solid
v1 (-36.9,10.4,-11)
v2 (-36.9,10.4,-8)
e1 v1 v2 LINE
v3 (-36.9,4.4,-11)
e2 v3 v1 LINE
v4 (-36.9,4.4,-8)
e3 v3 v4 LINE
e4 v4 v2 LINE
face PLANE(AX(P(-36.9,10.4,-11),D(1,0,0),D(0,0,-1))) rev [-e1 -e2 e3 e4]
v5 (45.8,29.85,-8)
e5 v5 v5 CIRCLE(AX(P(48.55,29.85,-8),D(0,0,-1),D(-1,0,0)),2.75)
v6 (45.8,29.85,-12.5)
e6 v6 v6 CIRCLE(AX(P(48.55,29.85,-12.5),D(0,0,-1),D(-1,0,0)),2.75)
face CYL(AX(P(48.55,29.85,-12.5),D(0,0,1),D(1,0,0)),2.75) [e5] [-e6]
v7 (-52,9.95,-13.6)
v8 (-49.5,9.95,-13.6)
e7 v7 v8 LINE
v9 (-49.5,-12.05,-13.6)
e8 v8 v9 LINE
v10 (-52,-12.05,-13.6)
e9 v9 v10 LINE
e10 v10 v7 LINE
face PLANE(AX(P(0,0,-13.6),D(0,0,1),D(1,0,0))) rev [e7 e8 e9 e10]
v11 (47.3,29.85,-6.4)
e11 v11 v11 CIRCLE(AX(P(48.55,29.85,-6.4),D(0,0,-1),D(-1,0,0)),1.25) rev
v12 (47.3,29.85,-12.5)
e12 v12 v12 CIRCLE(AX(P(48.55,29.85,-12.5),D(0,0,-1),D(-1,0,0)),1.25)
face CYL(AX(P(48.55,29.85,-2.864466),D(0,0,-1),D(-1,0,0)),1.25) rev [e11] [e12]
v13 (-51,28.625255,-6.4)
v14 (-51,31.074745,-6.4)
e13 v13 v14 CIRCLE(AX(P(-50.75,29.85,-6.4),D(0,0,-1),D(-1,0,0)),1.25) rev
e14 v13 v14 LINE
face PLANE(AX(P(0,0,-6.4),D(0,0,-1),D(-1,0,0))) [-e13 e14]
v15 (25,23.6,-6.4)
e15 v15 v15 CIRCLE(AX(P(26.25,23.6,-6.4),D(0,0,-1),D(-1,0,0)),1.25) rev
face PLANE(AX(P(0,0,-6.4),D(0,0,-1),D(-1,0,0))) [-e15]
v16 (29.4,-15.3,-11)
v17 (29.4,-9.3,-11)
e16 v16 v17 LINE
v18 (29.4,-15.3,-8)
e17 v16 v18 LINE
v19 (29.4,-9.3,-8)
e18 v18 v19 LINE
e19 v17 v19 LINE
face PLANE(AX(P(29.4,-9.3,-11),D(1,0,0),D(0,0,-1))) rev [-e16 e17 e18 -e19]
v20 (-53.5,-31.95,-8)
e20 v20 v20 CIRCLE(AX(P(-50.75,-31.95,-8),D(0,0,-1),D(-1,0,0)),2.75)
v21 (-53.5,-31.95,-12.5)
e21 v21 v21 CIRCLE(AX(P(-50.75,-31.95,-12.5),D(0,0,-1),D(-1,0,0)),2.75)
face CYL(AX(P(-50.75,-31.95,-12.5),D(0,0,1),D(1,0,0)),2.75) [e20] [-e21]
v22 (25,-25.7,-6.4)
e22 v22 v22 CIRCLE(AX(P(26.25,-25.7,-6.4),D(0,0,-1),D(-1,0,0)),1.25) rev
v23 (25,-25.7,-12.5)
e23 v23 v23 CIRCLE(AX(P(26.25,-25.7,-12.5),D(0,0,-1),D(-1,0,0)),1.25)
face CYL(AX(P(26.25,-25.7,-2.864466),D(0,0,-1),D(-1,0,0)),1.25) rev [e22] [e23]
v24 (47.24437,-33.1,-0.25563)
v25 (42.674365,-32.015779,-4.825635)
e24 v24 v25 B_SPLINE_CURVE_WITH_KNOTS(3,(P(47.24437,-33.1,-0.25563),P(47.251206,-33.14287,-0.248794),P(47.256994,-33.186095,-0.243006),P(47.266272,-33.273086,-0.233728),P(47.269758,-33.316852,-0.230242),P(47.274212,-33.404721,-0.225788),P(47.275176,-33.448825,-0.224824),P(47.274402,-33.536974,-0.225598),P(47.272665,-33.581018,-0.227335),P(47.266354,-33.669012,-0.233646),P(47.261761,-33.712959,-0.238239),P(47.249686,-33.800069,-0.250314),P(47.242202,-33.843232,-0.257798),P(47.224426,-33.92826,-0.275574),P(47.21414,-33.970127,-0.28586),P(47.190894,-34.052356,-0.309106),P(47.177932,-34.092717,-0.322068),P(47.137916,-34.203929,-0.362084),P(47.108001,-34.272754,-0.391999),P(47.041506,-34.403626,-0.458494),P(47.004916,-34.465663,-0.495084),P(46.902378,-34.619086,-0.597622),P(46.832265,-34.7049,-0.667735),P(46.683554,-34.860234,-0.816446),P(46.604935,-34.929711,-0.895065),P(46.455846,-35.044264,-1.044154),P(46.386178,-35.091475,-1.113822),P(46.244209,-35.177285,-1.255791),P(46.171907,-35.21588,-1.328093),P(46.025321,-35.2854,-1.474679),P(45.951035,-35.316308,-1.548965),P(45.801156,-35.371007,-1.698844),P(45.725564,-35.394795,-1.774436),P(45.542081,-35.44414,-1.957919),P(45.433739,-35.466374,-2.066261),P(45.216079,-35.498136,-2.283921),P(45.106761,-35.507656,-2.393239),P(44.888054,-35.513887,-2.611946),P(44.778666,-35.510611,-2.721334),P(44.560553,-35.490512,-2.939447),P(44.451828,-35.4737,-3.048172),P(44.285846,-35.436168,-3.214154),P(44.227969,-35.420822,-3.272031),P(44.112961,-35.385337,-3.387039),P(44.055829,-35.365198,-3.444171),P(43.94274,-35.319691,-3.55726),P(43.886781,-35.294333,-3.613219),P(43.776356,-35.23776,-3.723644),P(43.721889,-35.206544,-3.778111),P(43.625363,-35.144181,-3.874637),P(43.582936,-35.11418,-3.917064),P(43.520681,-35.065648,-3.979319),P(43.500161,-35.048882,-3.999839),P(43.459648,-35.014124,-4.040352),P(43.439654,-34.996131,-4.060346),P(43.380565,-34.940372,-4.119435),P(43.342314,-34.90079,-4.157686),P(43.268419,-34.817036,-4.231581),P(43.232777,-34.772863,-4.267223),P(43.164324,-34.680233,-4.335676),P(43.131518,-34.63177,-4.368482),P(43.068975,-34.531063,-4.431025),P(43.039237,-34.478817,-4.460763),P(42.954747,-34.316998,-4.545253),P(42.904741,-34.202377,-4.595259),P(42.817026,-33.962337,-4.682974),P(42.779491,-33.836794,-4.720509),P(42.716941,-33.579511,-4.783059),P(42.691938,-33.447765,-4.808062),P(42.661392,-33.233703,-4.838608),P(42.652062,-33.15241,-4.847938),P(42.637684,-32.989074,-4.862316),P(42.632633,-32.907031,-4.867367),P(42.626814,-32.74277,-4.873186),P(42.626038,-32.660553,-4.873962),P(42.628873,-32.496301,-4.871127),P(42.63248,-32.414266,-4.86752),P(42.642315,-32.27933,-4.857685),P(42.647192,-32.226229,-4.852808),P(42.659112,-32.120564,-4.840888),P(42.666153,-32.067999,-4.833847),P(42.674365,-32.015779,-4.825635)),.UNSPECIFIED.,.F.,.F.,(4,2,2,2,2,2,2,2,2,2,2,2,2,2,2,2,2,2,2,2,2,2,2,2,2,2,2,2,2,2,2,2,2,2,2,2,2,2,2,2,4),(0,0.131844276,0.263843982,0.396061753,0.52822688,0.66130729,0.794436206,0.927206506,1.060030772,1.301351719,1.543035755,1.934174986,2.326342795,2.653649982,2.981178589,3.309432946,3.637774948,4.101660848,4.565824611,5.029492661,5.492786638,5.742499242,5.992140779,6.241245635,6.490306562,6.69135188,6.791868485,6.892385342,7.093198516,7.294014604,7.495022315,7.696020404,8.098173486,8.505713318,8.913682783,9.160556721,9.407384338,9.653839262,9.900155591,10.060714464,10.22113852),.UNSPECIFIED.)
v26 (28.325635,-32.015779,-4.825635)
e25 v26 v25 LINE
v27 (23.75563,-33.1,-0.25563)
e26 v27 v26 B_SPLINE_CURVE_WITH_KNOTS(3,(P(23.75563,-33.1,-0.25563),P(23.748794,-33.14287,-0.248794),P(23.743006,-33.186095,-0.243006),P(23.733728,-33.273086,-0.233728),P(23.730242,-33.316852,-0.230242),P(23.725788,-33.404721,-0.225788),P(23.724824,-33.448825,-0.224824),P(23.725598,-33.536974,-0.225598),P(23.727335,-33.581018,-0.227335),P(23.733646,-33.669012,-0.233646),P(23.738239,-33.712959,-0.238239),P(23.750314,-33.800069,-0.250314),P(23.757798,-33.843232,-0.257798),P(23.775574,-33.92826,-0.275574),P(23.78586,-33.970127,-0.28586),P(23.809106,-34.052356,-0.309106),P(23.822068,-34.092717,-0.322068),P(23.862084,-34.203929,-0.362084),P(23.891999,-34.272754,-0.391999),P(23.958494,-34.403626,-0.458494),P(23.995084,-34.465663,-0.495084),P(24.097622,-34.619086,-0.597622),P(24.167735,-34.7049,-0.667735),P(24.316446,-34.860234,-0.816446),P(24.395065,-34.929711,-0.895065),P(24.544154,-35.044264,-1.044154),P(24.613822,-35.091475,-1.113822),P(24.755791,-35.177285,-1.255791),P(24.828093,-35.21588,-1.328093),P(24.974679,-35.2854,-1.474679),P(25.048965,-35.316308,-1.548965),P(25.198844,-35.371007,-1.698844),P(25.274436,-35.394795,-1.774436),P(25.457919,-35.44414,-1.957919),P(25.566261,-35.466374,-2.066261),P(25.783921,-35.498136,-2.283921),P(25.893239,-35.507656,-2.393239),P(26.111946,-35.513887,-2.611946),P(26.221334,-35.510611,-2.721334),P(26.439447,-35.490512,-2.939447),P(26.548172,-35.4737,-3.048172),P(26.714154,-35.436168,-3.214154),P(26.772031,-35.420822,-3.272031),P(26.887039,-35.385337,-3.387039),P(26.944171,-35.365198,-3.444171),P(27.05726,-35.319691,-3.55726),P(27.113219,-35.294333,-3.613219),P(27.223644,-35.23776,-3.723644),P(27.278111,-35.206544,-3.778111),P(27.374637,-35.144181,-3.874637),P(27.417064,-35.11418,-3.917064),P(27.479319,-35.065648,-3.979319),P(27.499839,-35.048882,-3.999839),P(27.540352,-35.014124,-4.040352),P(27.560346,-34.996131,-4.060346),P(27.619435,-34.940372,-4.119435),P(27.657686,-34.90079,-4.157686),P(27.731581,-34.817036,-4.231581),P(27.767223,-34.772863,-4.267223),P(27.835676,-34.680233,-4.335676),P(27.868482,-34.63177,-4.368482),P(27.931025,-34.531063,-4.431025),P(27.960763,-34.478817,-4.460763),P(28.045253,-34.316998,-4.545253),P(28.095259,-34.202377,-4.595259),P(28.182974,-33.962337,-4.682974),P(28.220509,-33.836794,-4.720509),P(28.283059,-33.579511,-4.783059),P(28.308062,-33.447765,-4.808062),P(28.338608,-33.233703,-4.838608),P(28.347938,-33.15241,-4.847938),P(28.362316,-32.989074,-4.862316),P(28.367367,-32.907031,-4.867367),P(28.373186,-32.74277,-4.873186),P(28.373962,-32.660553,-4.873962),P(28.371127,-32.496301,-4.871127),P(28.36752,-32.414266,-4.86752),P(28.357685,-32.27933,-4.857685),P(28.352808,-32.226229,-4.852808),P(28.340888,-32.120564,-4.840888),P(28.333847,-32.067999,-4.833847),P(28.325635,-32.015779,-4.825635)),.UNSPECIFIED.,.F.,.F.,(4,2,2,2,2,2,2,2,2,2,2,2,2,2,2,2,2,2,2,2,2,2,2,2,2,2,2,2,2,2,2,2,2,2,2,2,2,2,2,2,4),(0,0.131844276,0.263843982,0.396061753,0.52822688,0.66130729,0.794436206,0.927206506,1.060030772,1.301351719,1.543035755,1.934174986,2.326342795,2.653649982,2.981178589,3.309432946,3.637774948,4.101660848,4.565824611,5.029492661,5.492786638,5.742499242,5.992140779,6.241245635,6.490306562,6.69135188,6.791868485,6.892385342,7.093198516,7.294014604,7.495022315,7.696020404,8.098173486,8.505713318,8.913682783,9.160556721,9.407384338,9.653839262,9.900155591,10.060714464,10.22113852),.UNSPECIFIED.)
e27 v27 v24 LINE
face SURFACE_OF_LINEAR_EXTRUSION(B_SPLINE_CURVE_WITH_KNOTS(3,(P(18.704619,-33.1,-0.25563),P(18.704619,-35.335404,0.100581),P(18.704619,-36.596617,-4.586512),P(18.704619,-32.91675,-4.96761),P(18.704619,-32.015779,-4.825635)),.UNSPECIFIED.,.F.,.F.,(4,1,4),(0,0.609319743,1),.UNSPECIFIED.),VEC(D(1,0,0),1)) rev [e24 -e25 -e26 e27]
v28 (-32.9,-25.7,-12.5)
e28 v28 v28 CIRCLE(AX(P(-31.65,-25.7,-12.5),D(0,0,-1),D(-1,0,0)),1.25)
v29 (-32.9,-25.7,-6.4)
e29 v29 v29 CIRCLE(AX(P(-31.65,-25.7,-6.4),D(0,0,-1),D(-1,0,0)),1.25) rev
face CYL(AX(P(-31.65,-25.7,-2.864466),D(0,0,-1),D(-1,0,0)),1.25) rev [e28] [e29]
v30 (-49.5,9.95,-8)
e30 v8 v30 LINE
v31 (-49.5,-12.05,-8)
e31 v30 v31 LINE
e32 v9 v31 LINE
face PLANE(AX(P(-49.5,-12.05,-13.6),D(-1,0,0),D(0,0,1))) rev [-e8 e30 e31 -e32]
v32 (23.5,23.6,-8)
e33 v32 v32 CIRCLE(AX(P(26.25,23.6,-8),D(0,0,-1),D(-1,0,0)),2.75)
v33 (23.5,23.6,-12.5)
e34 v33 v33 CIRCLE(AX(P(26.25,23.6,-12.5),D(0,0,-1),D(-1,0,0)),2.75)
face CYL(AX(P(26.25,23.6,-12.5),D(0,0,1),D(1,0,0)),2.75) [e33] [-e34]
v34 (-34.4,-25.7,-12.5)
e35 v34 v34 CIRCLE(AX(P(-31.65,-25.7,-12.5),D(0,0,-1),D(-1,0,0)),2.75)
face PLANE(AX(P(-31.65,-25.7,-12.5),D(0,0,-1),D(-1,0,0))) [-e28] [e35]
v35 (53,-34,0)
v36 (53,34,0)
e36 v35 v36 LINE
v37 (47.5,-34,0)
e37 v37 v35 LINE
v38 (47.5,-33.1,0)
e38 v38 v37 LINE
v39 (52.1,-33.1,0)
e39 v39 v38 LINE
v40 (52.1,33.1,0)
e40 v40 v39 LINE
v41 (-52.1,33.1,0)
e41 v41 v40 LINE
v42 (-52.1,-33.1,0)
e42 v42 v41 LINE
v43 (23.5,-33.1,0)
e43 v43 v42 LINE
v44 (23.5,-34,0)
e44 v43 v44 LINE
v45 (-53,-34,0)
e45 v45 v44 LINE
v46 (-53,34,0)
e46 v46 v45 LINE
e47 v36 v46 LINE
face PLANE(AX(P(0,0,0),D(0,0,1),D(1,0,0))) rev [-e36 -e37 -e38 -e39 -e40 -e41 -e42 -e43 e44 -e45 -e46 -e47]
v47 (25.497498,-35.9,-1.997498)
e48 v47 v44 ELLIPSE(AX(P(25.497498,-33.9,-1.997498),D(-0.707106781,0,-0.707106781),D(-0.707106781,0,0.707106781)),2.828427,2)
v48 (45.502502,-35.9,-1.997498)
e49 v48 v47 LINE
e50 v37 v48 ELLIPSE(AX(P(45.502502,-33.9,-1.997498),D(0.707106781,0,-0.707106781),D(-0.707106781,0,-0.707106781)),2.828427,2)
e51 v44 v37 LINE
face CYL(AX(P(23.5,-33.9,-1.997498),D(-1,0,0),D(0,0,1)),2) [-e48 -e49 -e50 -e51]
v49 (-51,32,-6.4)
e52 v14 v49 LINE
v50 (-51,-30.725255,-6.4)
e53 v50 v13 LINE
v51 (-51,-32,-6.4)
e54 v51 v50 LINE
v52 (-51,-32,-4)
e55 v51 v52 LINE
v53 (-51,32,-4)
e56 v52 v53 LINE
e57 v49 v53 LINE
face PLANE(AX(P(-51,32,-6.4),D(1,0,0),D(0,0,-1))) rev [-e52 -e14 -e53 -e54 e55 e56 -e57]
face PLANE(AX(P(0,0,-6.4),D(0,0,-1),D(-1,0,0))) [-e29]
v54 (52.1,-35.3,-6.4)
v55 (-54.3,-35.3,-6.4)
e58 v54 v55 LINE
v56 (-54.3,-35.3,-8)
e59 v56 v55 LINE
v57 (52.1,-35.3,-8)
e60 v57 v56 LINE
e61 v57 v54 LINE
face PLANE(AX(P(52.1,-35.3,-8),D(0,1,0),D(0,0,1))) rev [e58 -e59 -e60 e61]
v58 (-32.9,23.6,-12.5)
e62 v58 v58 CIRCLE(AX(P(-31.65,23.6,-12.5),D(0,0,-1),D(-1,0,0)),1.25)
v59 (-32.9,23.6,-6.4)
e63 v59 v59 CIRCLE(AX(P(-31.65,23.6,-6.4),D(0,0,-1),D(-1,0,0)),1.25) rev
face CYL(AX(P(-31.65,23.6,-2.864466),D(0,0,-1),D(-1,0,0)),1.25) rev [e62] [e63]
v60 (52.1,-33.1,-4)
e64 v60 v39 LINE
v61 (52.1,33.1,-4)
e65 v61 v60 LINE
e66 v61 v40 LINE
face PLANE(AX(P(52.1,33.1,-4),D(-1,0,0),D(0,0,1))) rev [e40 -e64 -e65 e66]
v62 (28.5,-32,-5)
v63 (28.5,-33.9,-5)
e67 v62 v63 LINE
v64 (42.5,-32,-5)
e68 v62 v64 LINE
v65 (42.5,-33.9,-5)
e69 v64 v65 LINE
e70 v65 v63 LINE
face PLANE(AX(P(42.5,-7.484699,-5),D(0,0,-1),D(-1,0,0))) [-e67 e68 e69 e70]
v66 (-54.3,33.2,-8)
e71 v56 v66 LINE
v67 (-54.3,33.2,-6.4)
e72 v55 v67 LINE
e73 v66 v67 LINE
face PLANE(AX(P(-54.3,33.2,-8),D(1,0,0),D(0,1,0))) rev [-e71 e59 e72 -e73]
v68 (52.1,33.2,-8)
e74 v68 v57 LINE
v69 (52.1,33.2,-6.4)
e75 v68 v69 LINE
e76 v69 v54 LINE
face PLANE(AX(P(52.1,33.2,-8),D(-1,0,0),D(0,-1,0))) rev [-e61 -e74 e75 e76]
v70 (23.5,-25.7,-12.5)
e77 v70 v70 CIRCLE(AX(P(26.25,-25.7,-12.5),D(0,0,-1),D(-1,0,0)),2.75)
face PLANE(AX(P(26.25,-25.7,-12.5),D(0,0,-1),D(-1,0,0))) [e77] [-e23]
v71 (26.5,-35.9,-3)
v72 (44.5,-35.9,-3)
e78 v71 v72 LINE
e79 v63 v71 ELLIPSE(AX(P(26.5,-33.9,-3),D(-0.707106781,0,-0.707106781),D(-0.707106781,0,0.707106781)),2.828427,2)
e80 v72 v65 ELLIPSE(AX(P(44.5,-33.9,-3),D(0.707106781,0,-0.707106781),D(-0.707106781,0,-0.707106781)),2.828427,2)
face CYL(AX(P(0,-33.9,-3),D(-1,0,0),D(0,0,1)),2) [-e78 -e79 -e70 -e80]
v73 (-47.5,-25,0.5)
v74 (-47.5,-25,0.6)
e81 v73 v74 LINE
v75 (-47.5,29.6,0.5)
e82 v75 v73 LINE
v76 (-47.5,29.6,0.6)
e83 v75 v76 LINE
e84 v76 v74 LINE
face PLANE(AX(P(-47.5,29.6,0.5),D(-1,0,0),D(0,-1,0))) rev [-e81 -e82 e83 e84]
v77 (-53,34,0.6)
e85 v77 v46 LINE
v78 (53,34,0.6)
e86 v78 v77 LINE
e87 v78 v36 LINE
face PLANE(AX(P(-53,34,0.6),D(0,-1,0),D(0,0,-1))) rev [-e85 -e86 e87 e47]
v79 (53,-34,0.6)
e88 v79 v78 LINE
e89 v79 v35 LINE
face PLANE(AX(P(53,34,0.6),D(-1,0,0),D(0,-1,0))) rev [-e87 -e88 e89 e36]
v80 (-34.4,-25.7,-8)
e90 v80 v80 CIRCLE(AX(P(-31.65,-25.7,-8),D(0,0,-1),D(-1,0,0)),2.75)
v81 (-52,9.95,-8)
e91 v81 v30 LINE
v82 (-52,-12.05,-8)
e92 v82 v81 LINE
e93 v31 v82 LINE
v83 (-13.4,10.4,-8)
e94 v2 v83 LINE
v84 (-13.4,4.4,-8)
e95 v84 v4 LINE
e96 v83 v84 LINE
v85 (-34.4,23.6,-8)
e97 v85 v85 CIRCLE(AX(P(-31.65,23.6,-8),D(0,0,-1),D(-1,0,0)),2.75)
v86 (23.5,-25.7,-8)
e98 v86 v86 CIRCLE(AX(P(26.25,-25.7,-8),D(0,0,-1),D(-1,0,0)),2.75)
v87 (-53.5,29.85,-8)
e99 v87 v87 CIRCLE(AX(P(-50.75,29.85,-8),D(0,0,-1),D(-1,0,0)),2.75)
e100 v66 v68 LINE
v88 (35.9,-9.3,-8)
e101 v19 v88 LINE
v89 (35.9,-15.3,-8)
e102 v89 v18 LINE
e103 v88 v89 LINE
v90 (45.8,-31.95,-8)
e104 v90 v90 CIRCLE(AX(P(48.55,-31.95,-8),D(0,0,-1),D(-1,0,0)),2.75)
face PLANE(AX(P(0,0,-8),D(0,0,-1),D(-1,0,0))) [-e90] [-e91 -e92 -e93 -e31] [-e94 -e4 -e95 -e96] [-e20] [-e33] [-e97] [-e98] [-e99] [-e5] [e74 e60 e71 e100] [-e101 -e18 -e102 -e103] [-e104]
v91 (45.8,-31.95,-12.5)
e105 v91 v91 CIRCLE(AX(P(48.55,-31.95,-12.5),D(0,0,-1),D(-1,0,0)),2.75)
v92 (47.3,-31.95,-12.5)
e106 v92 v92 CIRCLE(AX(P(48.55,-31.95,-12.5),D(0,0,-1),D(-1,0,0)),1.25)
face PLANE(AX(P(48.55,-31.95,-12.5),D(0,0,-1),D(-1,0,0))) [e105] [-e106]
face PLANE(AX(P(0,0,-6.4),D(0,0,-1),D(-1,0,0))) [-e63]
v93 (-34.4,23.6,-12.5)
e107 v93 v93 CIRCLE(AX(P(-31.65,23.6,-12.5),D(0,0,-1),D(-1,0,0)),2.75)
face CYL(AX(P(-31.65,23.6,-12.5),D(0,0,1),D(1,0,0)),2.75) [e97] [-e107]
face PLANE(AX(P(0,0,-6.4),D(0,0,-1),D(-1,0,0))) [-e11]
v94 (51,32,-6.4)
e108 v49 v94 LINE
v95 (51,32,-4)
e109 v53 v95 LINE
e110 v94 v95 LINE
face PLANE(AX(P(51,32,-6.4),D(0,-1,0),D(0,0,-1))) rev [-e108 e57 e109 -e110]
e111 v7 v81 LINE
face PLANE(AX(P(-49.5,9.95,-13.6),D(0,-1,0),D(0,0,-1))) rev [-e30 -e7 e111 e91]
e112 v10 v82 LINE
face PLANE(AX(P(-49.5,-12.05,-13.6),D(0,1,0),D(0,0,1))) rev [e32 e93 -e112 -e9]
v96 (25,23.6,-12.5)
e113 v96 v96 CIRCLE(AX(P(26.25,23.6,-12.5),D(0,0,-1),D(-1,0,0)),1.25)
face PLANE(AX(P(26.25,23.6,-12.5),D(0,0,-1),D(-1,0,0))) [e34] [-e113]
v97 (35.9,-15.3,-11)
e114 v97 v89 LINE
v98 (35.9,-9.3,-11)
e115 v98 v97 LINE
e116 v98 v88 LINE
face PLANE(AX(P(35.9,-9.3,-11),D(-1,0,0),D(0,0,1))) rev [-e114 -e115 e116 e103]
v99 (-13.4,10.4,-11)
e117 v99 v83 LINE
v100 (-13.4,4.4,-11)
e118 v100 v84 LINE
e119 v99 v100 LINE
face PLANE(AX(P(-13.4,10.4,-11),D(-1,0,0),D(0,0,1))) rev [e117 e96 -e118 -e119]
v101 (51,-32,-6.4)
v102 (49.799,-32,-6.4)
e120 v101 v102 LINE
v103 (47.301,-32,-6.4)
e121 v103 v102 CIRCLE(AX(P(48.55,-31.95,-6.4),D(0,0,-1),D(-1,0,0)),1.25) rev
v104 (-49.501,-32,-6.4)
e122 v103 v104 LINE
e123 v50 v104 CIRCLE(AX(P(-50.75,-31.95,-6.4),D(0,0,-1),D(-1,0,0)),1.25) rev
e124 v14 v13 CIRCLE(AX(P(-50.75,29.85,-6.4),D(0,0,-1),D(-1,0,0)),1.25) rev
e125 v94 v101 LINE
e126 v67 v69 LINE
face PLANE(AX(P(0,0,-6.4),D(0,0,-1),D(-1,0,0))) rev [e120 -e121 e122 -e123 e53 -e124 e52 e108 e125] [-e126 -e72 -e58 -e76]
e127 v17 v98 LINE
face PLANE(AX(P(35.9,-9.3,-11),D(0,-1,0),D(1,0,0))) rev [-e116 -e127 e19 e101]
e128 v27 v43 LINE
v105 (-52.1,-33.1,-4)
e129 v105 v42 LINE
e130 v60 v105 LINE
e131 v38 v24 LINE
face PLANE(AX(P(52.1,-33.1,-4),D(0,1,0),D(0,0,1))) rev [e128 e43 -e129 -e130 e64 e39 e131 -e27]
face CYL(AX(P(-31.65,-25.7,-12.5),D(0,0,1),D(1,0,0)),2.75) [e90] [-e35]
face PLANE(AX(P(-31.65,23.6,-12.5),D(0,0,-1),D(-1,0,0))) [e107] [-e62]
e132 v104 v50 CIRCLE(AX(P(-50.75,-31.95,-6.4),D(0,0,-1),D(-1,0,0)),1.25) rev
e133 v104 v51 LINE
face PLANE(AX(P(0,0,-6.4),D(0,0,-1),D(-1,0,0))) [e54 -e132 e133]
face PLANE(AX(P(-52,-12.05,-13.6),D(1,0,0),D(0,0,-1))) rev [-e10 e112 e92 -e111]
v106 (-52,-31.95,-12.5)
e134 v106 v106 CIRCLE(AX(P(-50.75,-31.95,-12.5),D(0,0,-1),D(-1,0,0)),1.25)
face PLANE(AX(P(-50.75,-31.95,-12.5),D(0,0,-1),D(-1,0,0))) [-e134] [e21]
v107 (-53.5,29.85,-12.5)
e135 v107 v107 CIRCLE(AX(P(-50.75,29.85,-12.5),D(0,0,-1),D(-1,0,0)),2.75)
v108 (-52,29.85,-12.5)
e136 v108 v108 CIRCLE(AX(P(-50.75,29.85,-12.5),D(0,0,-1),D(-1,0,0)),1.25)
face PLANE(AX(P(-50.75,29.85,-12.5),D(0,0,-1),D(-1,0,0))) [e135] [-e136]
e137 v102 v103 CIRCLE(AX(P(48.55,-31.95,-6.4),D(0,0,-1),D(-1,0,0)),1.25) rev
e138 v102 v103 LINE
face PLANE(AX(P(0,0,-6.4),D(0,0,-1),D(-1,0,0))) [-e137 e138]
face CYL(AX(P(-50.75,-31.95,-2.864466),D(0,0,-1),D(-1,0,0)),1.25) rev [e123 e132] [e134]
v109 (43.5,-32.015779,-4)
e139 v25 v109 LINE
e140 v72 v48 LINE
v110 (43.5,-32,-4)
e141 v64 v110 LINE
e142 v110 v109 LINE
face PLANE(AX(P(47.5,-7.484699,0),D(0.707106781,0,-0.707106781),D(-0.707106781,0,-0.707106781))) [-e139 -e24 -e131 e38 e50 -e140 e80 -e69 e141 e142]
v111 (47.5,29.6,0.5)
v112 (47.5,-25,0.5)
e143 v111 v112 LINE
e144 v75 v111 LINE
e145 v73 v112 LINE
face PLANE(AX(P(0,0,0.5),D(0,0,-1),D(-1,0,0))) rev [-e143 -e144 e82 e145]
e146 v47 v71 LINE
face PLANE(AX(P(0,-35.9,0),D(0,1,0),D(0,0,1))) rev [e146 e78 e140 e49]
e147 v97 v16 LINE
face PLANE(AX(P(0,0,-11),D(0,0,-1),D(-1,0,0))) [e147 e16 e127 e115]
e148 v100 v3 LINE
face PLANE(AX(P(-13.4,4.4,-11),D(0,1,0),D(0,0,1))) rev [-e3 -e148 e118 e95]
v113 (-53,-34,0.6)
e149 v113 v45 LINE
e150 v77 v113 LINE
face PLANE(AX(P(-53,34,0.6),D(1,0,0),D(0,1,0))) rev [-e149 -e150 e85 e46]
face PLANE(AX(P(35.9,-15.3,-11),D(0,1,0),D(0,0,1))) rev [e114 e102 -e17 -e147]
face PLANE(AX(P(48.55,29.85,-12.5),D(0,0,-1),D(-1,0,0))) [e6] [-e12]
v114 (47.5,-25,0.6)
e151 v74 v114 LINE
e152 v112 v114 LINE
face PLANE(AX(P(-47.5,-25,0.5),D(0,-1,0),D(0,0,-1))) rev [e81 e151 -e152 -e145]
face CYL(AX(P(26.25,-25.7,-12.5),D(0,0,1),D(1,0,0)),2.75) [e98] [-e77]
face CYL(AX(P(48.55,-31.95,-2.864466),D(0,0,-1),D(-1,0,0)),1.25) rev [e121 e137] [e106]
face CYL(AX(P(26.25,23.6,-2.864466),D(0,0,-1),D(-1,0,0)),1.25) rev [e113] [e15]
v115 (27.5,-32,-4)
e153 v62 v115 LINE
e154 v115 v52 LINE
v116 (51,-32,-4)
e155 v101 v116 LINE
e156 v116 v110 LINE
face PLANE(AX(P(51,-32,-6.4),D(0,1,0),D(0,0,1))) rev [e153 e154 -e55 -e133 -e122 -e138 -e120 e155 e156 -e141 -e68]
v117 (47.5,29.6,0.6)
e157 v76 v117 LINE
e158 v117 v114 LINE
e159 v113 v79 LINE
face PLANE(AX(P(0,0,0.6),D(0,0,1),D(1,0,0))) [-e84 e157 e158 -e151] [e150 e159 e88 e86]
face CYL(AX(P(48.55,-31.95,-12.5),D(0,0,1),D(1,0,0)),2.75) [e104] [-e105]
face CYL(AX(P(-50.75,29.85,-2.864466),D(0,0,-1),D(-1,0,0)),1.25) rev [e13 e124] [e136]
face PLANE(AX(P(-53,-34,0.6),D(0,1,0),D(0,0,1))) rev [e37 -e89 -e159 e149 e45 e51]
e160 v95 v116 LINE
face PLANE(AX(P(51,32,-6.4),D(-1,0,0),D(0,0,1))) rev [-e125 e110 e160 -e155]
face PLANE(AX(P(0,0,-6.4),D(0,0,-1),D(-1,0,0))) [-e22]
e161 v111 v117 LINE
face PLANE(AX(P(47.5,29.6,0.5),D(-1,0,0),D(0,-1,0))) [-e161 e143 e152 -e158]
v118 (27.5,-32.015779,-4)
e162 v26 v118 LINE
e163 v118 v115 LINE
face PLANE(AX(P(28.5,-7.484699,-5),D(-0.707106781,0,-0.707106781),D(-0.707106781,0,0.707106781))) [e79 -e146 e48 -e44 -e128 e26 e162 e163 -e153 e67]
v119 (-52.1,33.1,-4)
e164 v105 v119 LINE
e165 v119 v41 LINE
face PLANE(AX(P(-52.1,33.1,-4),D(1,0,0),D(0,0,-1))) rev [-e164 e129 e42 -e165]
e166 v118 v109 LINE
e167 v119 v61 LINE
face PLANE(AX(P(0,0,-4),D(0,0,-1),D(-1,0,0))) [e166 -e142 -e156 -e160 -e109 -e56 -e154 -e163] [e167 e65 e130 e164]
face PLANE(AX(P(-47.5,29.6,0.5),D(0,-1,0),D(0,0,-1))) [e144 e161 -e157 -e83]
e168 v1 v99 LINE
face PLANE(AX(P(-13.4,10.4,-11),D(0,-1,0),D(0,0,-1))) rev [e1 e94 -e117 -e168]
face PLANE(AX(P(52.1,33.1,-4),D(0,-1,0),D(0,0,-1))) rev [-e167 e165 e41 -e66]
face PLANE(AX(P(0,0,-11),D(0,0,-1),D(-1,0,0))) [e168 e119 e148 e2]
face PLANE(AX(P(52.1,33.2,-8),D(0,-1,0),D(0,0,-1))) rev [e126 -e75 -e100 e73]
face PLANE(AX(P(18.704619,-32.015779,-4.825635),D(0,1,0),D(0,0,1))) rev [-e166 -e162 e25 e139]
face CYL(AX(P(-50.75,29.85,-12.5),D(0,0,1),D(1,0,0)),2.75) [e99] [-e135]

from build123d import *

# Parameters (mm, degrees)
SKETCH1_W                       = 106
SKETCH1_H                       = 68
BOSS_EXTRUDE1_DEPTH             = 0.6
SKETCH2_W                       = 95
SKETCH2_H                       = 54.6
CUT_EXTRUDE1_DEPTH              = 0.1
SKETCH4_W                       = 104.2
SKETCH4_H                       = 66.2
BOSS_EXTRUDE2_DEPTH             = 4
SKETCH5_W                       = 102
SKETCH5_H                       = 64
BOSS_EXTRUDE3_DEPTH             = 2.4
SKETCH6_W                       = 106.4
SKETCH6_H                       = 68.5
BOSS_EXTRUDE4_DEPTH             = 1.6
BOSS_EXTRUDE5_DEPTH             = 2.8
BOSS_EXTRUDE5_DIRECTION_2_REACH = 88.689
FILLET1_R                       = 2
CUT_EXTRUDE2_REACH              = 114.578
SKETCH9_R                       = 2.75
BOSS_EXTRUDE6_DEPTH             = 4.5
SKETCH10_R                      = 1.25
CUT_EXTRUDE3_DEPTH              = 6.1
SKETCH11_W                      = 2.5
SKETCH11_H                      = 22
BOSS_EXTRUDE7_DEPTH             = 5.6
SKETCH12_W                      = 23.5
SKETCH12_H                      = 6
SKETCH12_W_2                    = 6.5
BOSS_EXTRUDE8_DEPTH             = 3


with BuildPart() as part:
    # Sketch1 → Boss-Extrude1 (new body)
    with BuildSketch(Plane.XY):
        Rectangle(SKETCH1_W, SKETCH1_H)
    extrude(amount=BOSS_EXTRUDE1_DEPTH)

    # Sketch2 → Cut-Extrude1 (cut)
    with BuildSketch(Plane.XY.offset(0.6)):
        with Locations((0, 2.3)):
            Rectangle(SKETCH2_W, SKETCH2_H)
    extrude(amount=-CUT_EXTRUDE1_DEPTH, mode=Mode.SUBTRACT)

    # Sketch4 → Boss-Extrude2 (add)
    with BuildSketch(Plane(origin=(0, 0, 0), x_dir=(-1, 0, 0), z_dir=(0, 0, -1))):
        Rectangle(SKETCH4_W, SKETCH4_H)
    extrude(amount=BOSS_EXTRUDE2_DEPTH)

    # Sketch5 → Boss-Extrude3 (add)
    with BuildSketch(Plane(origin=(0, 0, -4), x_dir=(-1, 0, 0), z_dir=(0, 0, -1))):
        Rectangle(SKETCH5_W, SKETCH5_H)
    extrude(amount=BOSS_EXTRUDE3_DEPTH)

    # Sketch6 → Boss-Extrude4 (add)
    with BuildSketch(Plane(origin=(0, 0, -6.4), x_dir=(-1, 0, 0), z_dir=(0, 0, -1))):
        with Locations((1.1, -1.05)):
            Rectangle(SKETCH6_W, SKETCH6_H)
    extrude(amount=BOSS_EXTRUDE4_DEPTH)

    # Sketch7 → Boss-Extrude5 (add)
    with BuildSketch(Plane.XZ.offset(33.1)):
        Polygon((47.5, 0), (42.5, -5), (28.5, -5), (23.5, 0), align=None)
    extrude(amount=BOSS_EXTRUDE5_DEPTH)

    # Boss-Extrude5 direction 2: up to this face of the body (flat: up to its plane)
    boss_extrude5_direction_2_end = Plane(part.part.faces().sort_by_distance((0, -32, -5.2))[0])
    # Sketch7 → Boss-Extrude5 direction 2 (add, up to the picked face)
    with BuildSketch(Plane.XZ.offset(33.1), mode=Mode.PRIVATE) as boss_extrude5_direction_2_sk1:
        Polygon((47.5, 0), (42.5, -5), (28.5, -5), (23.5, 0), align=None)
    boss_extrude5_direction_2_tool1 = split(extrude(boss_extrude5_direction_2_sk1.sketch, amount=-BOSS_EXTRUDE5_DIRECTION_2_REACH, mode=Mode.PRIVATE), bisect_by=boss_extrude5_direction_2_end, keep=Keep.BOTH, mode=Mode.PRIVATE)
    add(boss_extrude5_direction_2_tool1.solids().sort_by(Axis((35.5, -33.1, -2.280702), (0, 1, 0)))[0])

    # Fillet1
    # the kernel refuses this fillet: 2 mm, written as the material it takes off along each edge
    with BuildSketch(Plane(origin=(18.506253911, -35.9, 0), x_dir=(0, 1, 0), z_dir=(1, 0, 0))) as fillet1_piece_1:
        with BuildLine():
            CenterArc((2, -1.997498436), FILLET1_R, 92.865983983, 87.134016017)
            Line((0, -1.997498436), (-0.04, -1.997498436))
            Line((-0.04, -1.997498436), (-0.04, 0))
            Line((-0.04, 0), (0, 0.04))
            ThreePointArc((0, 0.04), (0.95, 0.04), (1.898, 0.039949969))
            Line((1.898, 0.039949969), (1.9, 0))
        make_face()
    extrude(amount=33.987492178, mode=Mode.SUBTRACT)
    with BuildSketch(Plane(origin=(47.5, -35.9, -5), x_dir=(0, 0, 1), z_dir=(-1, 0, 0))) as fillet1_piece_2:
        with BuildLine():
            CenterArc((FILLET1_R, FILLET1_R), FILLET1_R, 180, 90)
            Line((0, FILLET1_R), (-FILLET1_R * 0.02, FILLET1_R))
            Line((-FILLET1_R * 0.02, FILLET1_R), (-FILLET1_R * 0.02, -FILLET1_R * 0.02))
            Line((-FILLET1_R * 0.02, -FILLET1_R * 0.02), (FILLET1_R, -FILLET1_R * 0.02))
            Line((FILLET1_R, -FILLET1_R * 0.02), (FILLET1_R, 0))
        make_face()
    extrude(amount=24, mode=Mode.SUBTRACT)

    # Cut-Extrude2: up to this plane
    cut_extrude2_end = Plane(origin=(28.5, -7.484698656, -5), z_dir=(-0.7071067811865419, 0, -0.7071067811865531))
    # Sketch8 → Cut-Extrude2 (cut, up to the surface)
    with BuildSketch(Plane(origin=(52.1, 0, 0), x_dir=(0, 0, -1), z_dir=(1, 0, 0)), mode=Mode.PRIVATE) as cut_extrude2_sk1:
        with BuildLine():
            Line((4.825635078, -32.015779283), (4, -32.015779283))
            Line((4, -32.015779283), (4, -33.1))
            Line((4, -33.1), (0.255629625, -33.1))
            add(Edge.make_bspline(
                [(0.255629625, -33.1), (-0.100580752, -35.335403533), (4.586512434, -36.596617464), (4.967609775, -32.916750312), (4.825635078, -32.015779283)],
                knots=[0, 0, 0, 0, 0.609319743, 1, 1, 1, 1], degree=3))
        make_face()
    cut_extrude2_tool1 = split(extrude(cut_extrude2_sk1.sketch, amount=-CUT_EXTRUDE2_REACH, mode=Mode.PRIVATE), bisect_by=cut_extrude2_end, keep=Keep.BOTH, mode=Mode.PRIVATE)
    add(cut_extrude2_tool1.solids().sort_by_distance((52.1, -33.994656, -2.685344))[0], mode=Mode.SUBTRACT)

    # Sketch9 → Boss-Extrude6 (add)
    with BuildSketch(Plane(origin=(0, 0, -8), x_dir=(-1, 0, 0), z_dir=(0, 0, -1))):
        with Locations((-48.55, 29.85)):
            Circle(SKETCH9_R)
        with Locations((-48.55, -31.95)):
            Circle(SKETCH9_R)
        with Locations((50.75, 29.85)):
            Circle(SKETCH9_R)
        with Locations((50.75, -31.95)):
            Circle(SKETCH9_R)
        with Locations((-26.25, 23.6)):
            Circle(SKETCH9_R)
        with Locations((-26.25, -25.7)):
            Circle(SKETCH9_R)
        with Locations((31.65, 23.6)):
            Circle(SKETCH9_R)
        with Locations((31.65, -25.7)):
            Circle(SKETCH9_R)
    extrude(amount=BOSS_EXTRUDE6_DEPTH)

    # Sketch10 → Cut-Extrude3 (cut)
    with BuildSketch(Plane(origin=(0, 0, -12.5), x_dir=(-1, 0, 0), z_dir=(0, 0, -1))):
        with Locations((-48.55, 29.85)):
            Circle(SKETCH10_R)
        with Locations((-26.25, 23.6)):
            Circle(SKETCH10_R)
        with Locations((31.65, 23.6)):
            Circle(SKETCH10_R)
        with Locations((50.75, 29.85)):
            Circle(SKETCH10_R)
        with Locations((-26.25, -25.7)):
            Circle(SKETCH10_R)
        with Locations((-48.55, -31.95)):
            Circle(SKETCH10_R)
        with Locations((50.75, -31.95)):
            Circle(SKETCH10_R)
        with Locations((31.65, -25.7)):
            Circle(SKETCH10_R)
    extrude(amount=-CUT_EXTRUDE3_DEPTH, mode=Mode.SUBTRACT)

    # Sketch11 → Boss-Extrude7 (add)
    with BuildSketch(Plane(origin=(0, 0, -8), x_dir=(-1, 0, 0), z_dir=(0, 0, -1))):
        with Locations((50.75, -1.05)):
            Rectangle(SKETCH11_W, SKETCH11_H)
    extrude(amount=BOSS_EXTRUDE7_DEPTH)

    # Sketch12 → Boss-Extrude8 (add)
    with BuildSketch(Plane(origin=(0, 0, -8), x_dir=(-1, 0, 0), z_dir=(0, 0, -1))):
        with Locations((25.15, 7.4)):
            Rectangle(SKETCH12_W, SKETCH12_H)
        with Locations((-32.65, -12.3)):
            Rectangle(SKETCH12_W_2, SKETCH12_H)
    extrude(amount=BOSS_EXTRUDE8_DEPTH)


solid = part.part
